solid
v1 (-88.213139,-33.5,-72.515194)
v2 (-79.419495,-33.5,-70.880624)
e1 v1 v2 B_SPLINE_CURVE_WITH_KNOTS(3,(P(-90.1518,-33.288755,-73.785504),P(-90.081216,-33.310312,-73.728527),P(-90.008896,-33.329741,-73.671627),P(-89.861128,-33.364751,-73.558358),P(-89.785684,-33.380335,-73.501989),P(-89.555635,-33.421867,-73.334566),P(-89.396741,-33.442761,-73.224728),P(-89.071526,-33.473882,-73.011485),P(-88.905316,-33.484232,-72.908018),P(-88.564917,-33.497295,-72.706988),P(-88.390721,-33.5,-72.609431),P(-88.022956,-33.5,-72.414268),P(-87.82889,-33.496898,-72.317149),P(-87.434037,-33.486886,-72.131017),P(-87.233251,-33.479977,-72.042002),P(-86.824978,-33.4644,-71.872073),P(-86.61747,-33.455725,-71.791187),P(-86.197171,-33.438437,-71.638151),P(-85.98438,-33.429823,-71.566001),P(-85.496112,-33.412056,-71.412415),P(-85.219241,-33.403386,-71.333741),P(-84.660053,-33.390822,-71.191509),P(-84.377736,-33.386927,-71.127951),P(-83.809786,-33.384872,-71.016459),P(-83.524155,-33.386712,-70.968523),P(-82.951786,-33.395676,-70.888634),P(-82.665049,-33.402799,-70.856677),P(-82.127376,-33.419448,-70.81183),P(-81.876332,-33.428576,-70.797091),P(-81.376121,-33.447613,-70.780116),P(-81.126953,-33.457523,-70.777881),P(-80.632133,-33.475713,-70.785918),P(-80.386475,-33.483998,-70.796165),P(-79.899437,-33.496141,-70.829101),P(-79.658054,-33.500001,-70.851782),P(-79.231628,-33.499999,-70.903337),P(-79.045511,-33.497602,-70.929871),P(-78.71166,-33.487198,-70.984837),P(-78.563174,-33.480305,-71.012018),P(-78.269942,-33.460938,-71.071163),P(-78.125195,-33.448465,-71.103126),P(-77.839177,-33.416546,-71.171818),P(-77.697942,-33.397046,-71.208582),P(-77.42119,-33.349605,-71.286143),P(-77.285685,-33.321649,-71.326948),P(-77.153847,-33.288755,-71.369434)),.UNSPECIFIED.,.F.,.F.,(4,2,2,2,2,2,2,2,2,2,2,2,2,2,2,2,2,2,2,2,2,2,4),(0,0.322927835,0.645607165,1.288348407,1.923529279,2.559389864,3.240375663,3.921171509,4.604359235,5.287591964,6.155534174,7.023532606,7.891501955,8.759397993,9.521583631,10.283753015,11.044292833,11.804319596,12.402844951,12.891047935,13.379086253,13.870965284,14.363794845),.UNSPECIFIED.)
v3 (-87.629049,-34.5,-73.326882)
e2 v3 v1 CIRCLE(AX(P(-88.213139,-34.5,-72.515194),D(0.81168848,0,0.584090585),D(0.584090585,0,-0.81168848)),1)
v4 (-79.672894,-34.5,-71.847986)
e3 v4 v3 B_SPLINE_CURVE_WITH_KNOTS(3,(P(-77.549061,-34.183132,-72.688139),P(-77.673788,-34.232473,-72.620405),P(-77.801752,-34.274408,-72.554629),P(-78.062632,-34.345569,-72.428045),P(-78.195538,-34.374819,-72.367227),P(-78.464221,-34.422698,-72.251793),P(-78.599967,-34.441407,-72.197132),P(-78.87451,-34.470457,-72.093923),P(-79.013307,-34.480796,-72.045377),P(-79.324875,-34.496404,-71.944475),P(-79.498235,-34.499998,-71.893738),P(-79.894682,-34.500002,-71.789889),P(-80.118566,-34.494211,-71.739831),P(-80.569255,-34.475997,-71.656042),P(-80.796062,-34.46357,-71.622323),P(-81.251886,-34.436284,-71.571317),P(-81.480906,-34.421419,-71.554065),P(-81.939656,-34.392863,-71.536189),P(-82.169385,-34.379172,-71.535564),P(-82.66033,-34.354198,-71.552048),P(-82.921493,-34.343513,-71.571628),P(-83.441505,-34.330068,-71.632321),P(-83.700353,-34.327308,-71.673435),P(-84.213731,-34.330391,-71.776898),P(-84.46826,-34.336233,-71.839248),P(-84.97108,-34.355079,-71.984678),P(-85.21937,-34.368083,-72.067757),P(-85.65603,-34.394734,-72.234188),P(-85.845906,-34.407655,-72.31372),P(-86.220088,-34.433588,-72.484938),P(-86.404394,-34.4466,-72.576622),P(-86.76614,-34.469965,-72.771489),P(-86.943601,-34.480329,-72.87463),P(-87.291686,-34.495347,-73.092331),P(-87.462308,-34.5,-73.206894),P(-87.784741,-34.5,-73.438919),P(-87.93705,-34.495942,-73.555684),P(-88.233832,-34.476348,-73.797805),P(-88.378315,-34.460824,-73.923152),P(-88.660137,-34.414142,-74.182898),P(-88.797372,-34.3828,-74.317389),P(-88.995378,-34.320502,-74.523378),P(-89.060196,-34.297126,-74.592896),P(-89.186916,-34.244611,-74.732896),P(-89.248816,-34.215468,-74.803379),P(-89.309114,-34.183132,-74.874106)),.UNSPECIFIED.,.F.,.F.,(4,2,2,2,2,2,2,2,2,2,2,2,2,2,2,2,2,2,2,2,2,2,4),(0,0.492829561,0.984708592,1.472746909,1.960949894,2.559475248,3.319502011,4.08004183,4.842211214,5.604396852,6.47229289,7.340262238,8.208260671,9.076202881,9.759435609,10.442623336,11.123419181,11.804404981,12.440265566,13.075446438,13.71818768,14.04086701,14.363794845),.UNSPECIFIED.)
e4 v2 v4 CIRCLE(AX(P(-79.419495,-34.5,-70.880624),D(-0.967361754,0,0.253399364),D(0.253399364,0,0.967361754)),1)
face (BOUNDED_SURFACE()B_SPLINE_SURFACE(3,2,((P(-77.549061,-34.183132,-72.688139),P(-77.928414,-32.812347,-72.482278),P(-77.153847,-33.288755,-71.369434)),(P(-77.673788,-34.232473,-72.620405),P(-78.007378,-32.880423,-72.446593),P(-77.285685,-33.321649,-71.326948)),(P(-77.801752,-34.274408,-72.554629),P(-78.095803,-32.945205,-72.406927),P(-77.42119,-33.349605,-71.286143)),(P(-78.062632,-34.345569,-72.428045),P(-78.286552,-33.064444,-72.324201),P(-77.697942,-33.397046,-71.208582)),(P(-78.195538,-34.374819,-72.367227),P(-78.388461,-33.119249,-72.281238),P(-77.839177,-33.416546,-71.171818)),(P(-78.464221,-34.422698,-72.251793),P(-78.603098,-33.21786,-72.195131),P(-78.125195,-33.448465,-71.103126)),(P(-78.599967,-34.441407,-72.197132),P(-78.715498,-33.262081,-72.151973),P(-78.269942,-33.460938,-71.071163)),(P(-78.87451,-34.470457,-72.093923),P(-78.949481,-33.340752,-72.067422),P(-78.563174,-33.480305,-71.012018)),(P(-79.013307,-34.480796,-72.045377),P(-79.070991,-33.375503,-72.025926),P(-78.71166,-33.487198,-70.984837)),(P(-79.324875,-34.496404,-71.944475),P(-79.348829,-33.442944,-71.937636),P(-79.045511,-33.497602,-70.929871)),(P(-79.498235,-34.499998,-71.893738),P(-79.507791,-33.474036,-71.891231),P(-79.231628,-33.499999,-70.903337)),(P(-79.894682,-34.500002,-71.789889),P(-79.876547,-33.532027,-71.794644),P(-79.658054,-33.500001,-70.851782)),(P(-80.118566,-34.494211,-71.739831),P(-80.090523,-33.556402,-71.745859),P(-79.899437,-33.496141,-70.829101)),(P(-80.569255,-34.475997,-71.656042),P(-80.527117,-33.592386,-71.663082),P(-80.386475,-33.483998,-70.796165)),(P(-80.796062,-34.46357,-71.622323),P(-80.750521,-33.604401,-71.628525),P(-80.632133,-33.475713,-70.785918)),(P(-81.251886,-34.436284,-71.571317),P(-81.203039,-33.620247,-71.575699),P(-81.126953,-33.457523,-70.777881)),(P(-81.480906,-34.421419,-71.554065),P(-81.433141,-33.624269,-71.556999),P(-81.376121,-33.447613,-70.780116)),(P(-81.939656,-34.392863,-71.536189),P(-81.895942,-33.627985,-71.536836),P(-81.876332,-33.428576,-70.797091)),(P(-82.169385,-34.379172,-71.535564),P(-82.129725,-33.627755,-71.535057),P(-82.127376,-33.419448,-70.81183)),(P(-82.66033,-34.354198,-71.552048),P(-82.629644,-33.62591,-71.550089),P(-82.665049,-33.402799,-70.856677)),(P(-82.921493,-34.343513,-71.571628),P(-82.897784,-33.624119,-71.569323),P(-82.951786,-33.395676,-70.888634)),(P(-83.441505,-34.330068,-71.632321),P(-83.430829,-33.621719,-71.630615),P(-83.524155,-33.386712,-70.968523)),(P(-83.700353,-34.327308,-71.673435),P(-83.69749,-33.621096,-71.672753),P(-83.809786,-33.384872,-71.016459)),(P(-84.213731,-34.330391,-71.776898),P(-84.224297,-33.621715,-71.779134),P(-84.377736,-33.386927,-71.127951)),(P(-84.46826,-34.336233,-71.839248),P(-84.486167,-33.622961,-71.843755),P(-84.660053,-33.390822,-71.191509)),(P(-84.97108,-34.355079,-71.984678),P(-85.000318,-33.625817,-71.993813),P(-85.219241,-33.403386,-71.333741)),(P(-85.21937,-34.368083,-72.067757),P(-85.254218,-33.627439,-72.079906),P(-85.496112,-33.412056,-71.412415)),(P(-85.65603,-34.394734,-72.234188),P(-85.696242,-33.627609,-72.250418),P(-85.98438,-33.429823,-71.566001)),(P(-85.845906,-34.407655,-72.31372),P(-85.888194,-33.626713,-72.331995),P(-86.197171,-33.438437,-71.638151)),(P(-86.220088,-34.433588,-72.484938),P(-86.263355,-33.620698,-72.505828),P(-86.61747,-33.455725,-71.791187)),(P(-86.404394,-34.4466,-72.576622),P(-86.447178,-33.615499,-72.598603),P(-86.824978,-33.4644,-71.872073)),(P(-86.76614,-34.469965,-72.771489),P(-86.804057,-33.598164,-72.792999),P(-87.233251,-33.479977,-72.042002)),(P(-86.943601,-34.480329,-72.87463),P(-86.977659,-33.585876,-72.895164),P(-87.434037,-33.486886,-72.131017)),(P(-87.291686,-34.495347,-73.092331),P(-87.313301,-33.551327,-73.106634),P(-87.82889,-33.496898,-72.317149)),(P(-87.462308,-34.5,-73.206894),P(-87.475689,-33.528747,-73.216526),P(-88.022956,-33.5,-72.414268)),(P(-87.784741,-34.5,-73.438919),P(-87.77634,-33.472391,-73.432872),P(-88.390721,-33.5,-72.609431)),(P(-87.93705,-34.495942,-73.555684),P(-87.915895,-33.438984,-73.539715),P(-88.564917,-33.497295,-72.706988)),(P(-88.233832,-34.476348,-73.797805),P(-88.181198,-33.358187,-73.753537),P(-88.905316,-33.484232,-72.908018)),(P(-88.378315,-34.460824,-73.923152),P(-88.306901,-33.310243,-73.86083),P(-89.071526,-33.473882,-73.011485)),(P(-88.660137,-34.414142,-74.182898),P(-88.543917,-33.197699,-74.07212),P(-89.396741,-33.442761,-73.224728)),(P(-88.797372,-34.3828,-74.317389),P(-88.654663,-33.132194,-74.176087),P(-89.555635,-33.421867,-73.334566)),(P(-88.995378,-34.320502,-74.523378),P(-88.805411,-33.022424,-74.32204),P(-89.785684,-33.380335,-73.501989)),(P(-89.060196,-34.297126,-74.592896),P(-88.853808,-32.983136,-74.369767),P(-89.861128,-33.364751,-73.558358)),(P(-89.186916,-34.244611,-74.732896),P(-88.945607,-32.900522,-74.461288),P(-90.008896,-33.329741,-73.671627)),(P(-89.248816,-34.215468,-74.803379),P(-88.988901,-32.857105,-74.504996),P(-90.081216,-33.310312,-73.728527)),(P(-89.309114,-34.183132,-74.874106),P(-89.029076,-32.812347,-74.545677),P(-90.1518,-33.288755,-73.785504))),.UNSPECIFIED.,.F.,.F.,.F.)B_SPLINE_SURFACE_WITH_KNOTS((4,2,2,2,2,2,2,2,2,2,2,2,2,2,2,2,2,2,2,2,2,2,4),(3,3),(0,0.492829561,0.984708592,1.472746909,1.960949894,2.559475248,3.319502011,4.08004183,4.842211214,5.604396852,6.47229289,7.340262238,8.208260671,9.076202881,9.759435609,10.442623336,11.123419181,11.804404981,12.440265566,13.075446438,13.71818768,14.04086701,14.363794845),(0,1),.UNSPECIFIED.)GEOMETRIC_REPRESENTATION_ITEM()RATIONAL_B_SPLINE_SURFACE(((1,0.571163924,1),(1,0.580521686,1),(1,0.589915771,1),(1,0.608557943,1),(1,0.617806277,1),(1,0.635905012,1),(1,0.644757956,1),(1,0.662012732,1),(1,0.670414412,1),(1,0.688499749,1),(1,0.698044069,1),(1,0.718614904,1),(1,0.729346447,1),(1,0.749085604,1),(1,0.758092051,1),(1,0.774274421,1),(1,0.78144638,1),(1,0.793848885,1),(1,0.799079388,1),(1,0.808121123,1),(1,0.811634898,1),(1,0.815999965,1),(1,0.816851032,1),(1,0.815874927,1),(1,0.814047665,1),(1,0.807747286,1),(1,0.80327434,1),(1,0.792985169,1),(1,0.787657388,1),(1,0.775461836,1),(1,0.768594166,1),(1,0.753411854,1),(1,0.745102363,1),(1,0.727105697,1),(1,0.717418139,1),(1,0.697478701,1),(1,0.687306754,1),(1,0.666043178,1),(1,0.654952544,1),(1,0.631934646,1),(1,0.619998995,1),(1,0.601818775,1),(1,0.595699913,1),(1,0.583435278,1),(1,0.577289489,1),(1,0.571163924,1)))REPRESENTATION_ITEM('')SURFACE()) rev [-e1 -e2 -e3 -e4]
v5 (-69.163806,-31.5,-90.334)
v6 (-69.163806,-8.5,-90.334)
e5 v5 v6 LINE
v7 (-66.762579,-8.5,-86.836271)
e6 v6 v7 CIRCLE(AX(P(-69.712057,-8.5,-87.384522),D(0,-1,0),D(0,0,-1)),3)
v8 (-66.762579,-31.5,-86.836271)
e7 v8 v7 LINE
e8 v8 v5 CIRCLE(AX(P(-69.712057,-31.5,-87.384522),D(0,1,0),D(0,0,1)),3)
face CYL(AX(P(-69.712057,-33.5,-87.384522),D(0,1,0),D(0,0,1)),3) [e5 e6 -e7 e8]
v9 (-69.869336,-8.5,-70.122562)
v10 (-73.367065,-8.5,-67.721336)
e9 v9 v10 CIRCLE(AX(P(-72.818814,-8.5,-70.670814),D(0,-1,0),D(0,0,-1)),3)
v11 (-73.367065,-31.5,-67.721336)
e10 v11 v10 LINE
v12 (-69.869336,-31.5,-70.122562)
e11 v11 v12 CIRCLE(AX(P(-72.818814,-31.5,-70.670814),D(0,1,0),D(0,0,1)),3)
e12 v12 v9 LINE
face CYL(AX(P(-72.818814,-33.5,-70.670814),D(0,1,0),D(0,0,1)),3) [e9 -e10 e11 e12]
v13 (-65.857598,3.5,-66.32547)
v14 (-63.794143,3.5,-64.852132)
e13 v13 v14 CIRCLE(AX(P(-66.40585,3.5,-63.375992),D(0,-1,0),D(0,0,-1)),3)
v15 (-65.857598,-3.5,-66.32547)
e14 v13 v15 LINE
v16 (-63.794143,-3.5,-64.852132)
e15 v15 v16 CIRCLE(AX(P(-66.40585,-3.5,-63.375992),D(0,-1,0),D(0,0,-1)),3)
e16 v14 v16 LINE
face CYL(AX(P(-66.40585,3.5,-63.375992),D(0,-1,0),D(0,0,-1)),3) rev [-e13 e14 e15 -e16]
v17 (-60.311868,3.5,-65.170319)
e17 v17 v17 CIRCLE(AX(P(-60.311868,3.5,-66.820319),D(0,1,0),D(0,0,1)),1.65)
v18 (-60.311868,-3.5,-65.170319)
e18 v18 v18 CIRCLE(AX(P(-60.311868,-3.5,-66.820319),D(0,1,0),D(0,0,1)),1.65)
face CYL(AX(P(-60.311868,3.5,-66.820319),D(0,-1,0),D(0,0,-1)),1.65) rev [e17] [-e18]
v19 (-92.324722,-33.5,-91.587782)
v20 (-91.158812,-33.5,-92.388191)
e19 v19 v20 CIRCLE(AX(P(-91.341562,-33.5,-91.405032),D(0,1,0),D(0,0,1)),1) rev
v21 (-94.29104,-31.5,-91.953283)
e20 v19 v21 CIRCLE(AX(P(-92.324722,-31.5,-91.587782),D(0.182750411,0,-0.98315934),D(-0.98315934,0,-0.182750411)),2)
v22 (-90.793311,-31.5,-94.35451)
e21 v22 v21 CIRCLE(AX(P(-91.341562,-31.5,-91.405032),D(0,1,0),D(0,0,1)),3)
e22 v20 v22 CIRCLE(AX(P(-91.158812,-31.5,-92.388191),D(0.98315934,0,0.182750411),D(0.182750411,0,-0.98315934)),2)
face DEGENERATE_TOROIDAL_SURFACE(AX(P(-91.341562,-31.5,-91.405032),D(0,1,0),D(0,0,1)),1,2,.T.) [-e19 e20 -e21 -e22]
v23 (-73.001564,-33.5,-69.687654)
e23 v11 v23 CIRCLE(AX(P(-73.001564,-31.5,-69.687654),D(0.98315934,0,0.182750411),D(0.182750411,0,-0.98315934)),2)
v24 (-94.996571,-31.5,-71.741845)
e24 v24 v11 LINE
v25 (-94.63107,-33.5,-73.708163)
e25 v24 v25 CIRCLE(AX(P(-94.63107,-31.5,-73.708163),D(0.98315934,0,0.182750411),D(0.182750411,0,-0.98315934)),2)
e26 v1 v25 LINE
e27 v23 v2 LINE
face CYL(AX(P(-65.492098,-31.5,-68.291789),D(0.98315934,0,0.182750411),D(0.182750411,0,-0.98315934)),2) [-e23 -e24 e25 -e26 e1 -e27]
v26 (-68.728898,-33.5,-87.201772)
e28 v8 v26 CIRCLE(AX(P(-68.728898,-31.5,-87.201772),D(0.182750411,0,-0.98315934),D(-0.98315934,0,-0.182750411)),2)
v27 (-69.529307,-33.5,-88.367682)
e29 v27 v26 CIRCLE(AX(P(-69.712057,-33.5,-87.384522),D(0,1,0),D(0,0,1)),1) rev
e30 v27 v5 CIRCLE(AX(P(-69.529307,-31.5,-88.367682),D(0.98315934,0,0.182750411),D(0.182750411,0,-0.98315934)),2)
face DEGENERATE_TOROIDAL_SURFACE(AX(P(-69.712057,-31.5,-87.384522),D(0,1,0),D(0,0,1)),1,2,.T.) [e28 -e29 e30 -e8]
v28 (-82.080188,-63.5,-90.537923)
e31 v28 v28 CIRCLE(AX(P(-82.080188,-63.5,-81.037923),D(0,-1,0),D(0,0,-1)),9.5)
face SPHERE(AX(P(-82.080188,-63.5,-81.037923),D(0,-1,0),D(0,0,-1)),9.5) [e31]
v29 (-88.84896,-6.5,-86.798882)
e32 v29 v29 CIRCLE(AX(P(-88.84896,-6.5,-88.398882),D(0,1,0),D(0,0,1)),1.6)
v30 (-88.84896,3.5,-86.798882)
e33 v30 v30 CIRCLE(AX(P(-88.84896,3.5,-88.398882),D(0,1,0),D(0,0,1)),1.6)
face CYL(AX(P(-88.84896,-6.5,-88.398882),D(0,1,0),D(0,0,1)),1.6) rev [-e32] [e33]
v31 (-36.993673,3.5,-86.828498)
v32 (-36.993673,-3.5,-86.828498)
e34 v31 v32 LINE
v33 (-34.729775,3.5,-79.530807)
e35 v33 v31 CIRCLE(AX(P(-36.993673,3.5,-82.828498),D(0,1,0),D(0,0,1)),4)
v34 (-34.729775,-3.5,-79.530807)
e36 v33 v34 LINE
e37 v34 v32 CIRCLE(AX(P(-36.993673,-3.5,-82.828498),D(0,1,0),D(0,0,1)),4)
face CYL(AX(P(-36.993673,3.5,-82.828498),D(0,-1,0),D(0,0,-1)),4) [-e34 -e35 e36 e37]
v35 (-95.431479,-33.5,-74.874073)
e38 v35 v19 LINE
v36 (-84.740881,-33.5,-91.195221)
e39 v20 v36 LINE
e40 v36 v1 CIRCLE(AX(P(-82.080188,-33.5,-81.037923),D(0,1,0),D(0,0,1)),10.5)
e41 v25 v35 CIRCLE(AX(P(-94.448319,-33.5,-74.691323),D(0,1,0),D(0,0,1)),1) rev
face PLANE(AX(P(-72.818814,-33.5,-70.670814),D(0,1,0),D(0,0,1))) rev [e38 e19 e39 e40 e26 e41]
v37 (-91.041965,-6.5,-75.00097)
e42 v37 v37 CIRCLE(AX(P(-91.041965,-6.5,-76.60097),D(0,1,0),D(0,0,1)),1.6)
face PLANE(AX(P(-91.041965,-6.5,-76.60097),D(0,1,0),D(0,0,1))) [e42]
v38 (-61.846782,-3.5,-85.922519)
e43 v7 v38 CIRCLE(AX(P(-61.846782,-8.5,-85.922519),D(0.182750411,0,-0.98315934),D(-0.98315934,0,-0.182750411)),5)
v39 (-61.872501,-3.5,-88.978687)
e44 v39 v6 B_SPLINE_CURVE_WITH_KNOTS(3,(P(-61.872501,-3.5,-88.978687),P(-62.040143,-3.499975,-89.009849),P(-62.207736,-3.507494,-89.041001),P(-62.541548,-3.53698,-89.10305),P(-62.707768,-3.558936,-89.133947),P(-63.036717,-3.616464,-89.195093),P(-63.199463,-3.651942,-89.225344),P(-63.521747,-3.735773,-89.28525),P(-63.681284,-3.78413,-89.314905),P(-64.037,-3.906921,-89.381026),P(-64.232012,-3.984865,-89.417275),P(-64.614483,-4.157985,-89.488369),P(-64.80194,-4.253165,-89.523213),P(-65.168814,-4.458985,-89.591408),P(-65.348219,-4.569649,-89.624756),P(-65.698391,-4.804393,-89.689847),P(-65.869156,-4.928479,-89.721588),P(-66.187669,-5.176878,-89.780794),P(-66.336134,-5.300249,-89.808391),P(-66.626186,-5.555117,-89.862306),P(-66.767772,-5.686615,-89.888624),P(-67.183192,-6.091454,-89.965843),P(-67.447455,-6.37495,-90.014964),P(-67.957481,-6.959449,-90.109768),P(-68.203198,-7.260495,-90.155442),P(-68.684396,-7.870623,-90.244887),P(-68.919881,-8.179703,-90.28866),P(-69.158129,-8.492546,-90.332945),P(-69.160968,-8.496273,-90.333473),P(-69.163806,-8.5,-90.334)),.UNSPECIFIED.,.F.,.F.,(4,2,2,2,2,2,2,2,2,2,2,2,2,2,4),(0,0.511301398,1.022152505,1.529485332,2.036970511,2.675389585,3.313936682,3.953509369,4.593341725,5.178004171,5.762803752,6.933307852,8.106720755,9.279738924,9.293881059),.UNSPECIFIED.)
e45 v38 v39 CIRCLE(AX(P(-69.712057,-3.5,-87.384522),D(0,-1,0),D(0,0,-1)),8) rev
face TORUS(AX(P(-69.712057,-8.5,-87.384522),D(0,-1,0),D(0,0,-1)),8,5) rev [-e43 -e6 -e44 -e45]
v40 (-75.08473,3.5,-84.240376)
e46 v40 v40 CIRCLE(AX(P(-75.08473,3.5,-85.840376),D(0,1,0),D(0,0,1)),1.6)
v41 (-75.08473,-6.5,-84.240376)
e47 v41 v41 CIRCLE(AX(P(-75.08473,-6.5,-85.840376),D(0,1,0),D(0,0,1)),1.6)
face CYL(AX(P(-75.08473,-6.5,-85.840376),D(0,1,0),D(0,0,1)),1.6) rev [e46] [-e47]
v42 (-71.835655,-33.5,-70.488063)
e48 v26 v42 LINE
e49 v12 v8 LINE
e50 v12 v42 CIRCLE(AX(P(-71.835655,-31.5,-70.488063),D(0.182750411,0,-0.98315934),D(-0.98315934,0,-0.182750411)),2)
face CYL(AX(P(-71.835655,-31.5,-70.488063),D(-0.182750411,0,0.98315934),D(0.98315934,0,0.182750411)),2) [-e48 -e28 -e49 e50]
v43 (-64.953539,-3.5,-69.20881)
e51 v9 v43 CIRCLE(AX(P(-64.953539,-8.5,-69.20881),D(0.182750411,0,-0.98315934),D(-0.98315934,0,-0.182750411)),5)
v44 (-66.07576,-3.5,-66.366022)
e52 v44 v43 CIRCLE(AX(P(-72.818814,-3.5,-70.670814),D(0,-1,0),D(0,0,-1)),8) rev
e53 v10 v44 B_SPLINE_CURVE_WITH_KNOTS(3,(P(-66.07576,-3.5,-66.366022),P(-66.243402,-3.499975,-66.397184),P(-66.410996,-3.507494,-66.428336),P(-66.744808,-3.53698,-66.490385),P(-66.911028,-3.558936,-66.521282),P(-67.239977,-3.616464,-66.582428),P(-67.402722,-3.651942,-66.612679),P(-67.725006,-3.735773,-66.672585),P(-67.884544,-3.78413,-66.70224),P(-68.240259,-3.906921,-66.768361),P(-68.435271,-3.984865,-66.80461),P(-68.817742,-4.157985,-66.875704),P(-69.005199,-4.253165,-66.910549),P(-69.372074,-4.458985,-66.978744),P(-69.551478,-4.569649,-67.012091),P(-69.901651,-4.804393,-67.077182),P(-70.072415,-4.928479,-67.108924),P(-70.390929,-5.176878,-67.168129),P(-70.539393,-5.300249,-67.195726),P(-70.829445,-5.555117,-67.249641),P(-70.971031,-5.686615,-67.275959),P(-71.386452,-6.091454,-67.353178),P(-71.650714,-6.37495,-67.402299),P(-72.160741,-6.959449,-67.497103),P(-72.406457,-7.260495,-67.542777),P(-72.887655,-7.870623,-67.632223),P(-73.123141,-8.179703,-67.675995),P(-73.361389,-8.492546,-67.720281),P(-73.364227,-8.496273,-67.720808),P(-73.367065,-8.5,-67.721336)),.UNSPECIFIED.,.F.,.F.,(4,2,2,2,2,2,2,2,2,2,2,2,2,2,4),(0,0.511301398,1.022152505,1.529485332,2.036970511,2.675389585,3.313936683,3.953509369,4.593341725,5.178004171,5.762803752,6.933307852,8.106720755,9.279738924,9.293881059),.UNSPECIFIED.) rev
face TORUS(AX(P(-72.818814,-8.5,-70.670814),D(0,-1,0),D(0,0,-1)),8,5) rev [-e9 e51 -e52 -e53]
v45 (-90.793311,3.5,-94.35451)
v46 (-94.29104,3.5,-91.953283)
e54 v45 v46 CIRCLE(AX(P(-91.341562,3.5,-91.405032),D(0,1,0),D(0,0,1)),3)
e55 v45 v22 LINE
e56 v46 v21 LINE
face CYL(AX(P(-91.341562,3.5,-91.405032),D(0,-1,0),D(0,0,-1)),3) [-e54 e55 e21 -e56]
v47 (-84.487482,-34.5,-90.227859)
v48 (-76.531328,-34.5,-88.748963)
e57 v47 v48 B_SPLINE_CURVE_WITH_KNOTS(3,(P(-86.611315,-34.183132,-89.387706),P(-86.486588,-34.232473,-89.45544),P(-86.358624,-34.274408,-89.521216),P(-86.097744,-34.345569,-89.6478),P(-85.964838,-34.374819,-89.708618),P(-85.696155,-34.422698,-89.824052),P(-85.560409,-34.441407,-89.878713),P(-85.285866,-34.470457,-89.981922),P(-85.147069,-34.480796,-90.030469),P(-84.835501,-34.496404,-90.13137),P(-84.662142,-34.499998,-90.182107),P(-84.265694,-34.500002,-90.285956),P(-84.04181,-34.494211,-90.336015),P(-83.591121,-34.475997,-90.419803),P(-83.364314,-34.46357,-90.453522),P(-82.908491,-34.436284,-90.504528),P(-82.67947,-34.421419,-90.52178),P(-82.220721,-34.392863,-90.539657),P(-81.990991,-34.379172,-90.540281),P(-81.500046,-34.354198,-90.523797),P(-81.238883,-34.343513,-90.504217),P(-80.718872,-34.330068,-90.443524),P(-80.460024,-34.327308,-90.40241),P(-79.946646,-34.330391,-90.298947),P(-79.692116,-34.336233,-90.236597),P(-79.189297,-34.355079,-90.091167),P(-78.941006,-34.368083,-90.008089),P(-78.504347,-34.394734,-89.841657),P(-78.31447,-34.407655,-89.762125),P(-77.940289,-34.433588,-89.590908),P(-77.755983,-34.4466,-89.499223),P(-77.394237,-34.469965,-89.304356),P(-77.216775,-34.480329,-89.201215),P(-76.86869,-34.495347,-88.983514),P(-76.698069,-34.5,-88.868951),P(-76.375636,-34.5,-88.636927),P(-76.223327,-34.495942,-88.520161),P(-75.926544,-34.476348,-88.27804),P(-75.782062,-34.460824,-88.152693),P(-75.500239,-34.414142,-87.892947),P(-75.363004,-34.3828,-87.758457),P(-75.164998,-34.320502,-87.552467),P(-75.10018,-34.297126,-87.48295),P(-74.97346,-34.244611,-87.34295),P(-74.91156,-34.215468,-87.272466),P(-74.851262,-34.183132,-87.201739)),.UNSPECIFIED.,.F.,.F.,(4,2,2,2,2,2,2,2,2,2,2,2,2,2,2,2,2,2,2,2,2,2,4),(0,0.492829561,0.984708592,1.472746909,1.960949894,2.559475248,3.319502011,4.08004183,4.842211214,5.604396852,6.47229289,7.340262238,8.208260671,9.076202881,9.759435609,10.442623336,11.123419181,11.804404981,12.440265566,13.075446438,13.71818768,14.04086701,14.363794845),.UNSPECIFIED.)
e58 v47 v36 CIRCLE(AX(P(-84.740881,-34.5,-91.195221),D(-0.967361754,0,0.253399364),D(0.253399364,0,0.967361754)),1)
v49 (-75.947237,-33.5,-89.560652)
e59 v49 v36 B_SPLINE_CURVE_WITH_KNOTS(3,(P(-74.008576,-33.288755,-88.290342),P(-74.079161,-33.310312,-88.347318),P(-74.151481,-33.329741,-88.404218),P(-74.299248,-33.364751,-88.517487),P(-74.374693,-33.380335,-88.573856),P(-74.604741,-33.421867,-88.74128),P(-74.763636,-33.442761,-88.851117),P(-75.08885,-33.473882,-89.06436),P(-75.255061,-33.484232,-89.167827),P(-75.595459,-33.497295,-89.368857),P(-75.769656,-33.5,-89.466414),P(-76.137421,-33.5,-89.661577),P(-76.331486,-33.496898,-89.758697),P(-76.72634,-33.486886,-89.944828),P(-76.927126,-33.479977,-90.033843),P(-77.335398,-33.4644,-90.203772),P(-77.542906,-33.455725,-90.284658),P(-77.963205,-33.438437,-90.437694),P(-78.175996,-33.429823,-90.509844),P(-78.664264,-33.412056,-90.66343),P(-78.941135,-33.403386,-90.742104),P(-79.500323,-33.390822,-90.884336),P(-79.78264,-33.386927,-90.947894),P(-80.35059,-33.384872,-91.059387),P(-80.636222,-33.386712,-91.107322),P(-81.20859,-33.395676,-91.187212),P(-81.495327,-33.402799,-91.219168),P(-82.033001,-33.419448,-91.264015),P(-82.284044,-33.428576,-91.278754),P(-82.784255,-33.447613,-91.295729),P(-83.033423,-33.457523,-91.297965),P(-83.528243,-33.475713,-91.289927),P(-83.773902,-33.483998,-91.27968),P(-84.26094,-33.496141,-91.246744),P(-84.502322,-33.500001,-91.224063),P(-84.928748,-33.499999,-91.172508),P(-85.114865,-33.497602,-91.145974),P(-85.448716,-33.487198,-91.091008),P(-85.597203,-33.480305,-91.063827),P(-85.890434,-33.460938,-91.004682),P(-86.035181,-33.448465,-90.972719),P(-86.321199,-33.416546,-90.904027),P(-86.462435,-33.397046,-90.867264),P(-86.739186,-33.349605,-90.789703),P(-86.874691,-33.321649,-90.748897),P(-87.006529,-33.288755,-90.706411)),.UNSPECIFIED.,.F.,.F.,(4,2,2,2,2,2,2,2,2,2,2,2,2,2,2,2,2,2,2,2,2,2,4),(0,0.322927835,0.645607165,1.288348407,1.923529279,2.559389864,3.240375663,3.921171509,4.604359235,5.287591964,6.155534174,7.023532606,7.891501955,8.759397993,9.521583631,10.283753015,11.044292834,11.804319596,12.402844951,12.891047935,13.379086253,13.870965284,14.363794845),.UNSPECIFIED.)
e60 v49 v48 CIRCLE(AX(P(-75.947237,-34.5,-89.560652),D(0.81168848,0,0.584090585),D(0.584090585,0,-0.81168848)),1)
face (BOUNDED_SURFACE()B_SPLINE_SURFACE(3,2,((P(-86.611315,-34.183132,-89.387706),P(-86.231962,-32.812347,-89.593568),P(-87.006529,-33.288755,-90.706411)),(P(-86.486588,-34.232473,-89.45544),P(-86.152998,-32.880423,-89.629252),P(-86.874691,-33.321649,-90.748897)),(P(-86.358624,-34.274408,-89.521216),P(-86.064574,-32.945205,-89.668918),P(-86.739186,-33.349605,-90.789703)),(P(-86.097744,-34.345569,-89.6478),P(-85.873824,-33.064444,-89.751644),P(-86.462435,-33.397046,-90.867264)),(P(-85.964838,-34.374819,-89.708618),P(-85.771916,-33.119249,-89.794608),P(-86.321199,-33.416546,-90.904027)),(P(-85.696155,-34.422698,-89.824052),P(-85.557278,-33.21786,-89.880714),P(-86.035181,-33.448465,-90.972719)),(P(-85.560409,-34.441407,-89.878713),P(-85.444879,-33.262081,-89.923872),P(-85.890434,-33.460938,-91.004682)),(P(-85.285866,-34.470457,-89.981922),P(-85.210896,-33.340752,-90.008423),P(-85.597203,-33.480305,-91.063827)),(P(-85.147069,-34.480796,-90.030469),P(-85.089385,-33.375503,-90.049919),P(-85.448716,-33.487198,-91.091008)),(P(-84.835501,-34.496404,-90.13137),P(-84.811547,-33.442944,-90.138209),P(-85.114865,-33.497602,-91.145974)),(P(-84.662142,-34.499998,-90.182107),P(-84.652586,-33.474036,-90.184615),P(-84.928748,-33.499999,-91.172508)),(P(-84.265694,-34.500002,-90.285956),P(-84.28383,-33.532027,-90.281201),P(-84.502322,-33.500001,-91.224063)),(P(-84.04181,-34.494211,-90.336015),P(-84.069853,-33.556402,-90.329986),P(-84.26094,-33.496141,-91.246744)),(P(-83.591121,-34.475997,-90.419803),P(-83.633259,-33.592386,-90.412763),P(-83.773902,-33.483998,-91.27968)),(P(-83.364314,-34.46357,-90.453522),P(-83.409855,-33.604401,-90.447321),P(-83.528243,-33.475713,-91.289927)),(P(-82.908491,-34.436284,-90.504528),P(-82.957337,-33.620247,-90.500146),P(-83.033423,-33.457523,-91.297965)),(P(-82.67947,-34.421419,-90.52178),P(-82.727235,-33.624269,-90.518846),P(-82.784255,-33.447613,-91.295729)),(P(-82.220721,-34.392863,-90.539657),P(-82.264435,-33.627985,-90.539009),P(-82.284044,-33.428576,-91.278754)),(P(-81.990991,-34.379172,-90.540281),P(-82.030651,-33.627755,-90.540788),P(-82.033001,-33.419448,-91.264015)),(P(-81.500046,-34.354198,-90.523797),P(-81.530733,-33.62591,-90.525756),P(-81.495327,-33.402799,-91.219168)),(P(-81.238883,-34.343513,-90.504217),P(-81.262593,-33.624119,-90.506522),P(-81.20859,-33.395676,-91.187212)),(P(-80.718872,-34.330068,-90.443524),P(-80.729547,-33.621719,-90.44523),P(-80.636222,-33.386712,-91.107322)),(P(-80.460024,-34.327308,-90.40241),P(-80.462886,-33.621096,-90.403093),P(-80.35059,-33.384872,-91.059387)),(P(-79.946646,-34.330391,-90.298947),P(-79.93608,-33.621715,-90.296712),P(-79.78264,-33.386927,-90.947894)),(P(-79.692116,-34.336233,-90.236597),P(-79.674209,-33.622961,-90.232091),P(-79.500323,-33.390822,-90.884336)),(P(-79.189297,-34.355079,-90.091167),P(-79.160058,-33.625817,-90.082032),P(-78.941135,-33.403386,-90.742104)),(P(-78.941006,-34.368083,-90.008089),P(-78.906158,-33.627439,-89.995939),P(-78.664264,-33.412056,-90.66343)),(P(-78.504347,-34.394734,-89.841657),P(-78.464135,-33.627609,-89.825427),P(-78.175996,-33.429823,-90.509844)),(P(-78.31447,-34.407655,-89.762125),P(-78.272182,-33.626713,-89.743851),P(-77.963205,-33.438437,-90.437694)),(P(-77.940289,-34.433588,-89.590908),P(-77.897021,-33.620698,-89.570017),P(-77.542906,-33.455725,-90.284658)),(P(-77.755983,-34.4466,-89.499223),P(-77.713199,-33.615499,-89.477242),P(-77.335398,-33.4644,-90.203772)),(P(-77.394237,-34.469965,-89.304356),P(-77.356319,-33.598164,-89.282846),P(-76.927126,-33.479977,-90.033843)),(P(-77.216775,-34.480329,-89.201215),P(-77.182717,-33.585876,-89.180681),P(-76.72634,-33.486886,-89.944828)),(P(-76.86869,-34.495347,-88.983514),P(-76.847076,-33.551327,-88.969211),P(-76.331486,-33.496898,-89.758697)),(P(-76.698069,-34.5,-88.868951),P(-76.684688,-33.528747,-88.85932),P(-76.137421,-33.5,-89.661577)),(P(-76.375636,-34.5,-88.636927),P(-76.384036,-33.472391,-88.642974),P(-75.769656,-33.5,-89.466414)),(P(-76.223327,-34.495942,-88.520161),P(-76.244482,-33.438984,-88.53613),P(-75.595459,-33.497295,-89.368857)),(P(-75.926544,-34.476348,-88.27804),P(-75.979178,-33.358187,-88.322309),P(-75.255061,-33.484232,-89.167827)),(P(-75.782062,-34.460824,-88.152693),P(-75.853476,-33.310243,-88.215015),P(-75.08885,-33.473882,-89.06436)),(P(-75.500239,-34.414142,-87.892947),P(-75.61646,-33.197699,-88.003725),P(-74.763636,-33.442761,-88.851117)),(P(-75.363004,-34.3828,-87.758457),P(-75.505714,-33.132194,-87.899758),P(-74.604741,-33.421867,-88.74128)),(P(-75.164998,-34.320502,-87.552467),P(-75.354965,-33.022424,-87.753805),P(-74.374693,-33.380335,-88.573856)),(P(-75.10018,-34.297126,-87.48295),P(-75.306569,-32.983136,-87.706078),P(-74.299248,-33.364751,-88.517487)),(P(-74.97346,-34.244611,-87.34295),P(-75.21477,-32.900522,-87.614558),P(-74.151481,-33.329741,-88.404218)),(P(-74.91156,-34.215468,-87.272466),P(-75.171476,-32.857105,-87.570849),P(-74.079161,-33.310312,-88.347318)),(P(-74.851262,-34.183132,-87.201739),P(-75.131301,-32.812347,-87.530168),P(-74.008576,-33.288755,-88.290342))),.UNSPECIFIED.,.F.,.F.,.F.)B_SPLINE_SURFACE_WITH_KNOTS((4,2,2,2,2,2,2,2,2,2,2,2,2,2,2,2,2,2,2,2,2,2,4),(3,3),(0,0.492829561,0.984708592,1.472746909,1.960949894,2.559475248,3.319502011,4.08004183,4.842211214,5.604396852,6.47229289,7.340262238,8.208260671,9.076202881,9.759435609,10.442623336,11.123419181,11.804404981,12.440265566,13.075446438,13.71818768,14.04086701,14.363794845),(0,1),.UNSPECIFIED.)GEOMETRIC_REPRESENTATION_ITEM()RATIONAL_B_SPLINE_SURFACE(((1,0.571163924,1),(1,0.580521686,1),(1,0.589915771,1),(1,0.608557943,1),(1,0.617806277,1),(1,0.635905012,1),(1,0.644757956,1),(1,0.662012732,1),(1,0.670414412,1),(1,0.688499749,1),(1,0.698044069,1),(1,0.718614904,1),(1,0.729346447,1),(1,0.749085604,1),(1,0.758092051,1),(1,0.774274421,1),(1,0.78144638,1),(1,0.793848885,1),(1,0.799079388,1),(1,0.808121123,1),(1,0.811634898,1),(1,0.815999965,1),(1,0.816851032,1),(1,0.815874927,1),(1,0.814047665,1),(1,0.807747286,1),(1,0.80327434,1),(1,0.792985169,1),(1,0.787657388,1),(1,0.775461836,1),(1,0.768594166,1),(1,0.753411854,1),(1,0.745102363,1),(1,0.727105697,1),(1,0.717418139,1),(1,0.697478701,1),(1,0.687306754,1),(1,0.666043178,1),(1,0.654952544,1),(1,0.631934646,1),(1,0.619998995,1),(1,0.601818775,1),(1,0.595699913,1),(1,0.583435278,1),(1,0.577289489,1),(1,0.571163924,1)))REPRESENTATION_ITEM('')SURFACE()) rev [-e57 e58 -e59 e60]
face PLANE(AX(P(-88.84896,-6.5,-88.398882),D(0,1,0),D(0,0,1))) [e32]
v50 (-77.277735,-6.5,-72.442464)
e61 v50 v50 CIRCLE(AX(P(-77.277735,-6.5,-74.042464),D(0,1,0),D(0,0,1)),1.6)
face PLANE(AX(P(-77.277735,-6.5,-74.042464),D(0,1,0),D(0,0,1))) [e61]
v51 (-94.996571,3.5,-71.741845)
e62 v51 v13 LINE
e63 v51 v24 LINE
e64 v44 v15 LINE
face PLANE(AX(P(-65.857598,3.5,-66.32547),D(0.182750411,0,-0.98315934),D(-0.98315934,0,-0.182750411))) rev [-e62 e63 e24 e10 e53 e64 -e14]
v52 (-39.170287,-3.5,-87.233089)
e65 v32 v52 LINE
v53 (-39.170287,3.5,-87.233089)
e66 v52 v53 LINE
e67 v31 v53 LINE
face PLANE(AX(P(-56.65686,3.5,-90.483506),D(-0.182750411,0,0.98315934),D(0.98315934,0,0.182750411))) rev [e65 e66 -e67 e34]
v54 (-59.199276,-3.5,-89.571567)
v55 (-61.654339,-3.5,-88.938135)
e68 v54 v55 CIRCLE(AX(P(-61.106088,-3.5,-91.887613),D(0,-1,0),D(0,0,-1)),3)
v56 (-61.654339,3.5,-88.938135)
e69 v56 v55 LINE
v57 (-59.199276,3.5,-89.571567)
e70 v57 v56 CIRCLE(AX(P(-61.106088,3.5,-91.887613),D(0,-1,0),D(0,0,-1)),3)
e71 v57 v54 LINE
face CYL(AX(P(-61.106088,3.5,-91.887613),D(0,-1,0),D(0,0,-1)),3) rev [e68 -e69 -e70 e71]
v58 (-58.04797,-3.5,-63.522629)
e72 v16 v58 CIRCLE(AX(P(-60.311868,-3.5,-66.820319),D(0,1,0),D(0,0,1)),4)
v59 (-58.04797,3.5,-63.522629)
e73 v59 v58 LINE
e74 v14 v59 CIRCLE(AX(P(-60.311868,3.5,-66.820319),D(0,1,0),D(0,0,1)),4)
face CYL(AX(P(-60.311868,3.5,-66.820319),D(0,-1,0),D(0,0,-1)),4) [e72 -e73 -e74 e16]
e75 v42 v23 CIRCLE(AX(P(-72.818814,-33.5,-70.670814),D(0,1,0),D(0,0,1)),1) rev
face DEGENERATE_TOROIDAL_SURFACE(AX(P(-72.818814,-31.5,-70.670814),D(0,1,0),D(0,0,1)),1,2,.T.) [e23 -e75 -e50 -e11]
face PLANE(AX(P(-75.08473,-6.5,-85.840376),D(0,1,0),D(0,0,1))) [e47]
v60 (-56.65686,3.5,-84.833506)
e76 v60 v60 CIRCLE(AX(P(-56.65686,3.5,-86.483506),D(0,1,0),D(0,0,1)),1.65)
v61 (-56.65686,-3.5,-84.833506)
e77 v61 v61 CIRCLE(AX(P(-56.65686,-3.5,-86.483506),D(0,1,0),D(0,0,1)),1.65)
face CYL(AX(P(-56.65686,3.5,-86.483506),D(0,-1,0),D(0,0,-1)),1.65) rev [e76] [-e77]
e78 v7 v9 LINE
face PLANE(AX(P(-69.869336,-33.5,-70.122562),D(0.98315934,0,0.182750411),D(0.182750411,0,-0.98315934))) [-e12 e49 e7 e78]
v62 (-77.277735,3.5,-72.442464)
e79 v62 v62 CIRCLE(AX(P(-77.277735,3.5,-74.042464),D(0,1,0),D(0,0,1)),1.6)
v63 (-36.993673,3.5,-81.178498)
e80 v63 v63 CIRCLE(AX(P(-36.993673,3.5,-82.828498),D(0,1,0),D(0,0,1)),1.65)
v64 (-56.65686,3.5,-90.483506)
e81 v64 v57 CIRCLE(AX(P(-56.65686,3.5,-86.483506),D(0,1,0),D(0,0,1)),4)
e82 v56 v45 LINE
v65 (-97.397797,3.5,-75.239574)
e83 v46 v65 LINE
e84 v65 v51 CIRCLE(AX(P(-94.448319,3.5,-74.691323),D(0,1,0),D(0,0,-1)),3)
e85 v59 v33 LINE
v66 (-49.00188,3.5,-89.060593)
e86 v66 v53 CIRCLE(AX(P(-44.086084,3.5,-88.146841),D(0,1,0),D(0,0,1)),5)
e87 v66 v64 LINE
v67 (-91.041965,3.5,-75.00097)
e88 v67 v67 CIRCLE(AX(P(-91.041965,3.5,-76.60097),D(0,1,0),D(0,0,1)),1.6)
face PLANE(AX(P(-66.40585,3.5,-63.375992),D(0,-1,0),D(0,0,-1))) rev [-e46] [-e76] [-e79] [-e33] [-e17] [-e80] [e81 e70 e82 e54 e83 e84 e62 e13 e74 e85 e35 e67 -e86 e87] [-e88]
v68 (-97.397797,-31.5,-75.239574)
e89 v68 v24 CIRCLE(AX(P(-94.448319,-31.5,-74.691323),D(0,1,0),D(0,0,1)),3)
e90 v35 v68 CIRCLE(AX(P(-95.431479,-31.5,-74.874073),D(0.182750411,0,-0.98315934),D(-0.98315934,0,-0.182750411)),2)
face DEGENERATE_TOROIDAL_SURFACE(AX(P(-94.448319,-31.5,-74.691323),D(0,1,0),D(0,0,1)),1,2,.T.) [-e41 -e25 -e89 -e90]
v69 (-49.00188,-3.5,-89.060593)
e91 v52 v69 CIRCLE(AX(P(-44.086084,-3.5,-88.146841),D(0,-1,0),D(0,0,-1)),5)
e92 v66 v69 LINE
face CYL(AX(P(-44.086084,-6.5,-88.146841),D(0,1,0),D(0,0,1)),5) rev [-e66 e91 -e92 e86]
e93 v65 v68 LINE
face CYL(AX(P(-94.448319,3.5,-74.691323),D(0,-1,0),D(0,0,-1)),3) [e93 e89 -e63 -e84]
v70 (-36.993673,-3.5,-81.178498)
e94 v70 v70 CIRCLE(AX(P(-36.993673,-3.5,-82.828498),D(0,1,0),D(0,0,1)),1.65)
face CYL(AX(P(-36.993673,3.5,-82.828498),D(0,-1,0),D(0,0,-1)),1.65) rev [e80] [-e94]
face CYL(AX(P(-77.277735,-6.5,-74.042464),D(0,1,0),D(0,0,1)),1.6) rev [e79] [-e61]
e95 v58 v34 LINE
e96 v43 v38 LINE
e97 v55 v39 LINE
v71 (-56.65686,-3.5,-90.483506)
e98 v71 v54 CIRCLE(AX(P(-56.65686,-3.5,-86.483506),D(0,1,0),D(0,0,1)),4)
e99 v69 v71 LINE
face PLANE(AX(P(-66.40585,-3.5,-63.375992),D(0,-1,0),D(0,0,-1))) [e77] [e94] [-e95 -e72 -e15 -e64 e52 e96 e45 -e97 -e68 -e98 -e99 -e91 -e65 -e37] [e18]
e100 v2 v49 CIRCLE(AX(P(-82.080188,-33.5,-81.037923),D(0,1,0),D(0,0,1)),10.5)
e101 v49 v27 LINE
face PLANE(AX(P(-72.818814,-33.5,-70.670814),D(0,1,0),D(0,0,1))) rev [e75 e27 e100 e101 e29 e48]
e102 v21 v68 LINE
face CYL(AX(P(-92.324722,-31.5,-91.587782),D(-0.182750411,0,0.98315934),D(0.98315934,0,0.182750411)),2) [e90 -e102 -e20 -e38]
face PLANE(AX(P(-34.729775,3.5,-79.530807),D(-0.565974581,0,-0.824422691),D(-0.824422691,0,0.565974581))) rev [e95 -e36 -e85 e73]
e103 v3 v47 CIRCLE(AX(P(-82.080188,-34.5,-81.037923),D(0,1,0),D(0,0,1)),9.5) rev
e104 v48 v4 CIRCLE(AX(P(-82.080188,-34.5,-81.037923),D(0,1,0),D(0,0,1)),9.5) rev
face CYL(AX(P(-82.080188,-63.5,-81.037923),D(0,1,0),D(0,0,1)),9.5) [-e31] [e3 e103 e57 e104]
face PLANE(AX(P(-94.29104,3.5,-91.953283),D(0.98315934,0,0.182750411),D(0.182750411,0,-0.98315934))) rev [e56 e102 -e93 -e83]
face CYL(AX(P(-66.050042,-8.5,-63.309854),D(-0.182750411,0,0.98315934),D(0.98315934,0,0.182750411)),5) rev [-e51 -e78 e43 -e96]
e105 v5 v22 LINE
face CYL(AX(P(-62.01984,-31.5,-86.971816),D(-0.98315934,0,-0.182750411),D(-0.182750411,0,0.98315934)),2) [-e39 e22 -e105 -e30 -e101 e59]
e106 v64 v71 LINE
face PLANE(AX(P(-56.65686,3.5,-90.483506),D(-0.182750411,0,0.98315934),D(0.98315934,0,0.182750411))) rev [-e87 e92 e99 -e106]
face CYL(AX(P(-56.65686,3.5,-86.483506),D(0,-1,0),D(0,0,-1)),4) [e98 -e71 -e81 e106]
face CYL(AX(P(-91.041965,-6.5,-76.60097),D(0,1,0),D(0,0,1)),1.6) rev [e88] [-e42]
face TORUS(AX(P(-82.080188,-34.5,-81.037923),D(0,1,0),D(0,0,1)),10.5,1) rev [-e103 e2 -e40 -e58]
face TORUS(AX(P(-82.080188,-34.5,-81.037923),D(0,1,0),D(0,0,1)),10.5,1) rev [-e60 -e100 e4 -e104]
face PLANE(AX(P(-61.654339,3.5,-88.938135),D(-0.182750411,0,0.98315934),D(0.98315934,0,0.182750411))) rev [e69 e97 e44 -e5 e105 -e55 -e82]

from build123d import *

# Parameters (mm, degrees)
SKETCH1_R           = 1.650000007
BOSS_EXTRUDE1_DEPTH = 3.5
BOSS_EXTRUDE3_DEPTH = 30
FILLET1_R           = 5
FILLET2_R           = 2
SKETCH4_R           = 9.5
BOSS_EXTRUDE4_DEPTH = 30
FILLET3_R           = 1
REVOLVE1_ANGLE      = 180
SKETCH6_R           = 5
CUT_EXTRUDE1_DEPTH  = 10
SKETCH7_R           = 1.6
CUT_EXTRUDE2_DEPTH  = 10


with BuildPart() as part:
    # Sketch1 → Boss-Extrude1 (new, symmetric)
    with BuildSketch(Plane(origin=(0, 0, 0), x_dir=(1, 0, 0), z_dir=(0, 1, 0))):
        with BuildLine():
            Line((-56.656859897, 90.483506167), (-36.993673105, 86.828497938))
            ThreePointArc((-36.993673105, 86.828497938), (-33.173282872, 84.013663947), (-34.729774781, 79.530807173))
            Line((-34.729774781, 79.530807173), (-58.047969803, 63.522628609))
            ThreePointArc((-58.047969803, 63.522628609), (-61.213536363, 62.923269927), (-63.79414326, 64.852132418))
            ThreePointArc((-63.79414326, 64.852132418), (-64.662572796, 65.817505246), (-65.857598376, 66.32547022))
            Line((-65.857598376, 66.32547022), (-94.996570641, 71.741844715))
            ThreePointArc((-94.996570641, 71.741844715), (-96.92158748, 72.993398991), (-97.397797425, 75.239573968))
            Line((-97.397797425, 75.239573968), (-94.29104043, 91.953282742))
            ThreePointArc((-94.29104043, 91.953282742), (-93.039486154, 93.878299581), (-90.793311177, 94.354509526))
            Line((-90.793311177, 94.354509526), (-61.654338999, 88.938135048))
            ThreePointArc((-61.654338999, 88.938135048), (-60.356600681, 88.982743171), (-59.199275822, 89.571567253))
            ThreePointArc((-59.199275822, 89.571567253), (-58.007370108, 90.248625312), (-56.656859897, 90.483506167))
        make_face()
        with Locations(Location((-56.656859897, 86.483506167, 0), (0, 0, 270))):
            Circle(SKETCH1_R, mode=Mode.SUBTRACT)
        with Locations(Location((-36.993673105, 82.828497938, 0), (0, 0, 270))):
            Circle(SKETCH1_R, mode=Mode.SUBTRACT)
        with Locations(Location((-60.311868127, 66.820319374, 0), (0, 0, 270))):
            Circle(SKETCH1_R, mode=Mode.SUBTRACT)
    extrude(amount=BOSS_EXTRUDE1_DEPTH, both=True)

    # Sketch3 → Boss-Extrude3 (add)
    with BuildSketch(Plane(origin=(0, -3.5, 0), x_dir=(1, 0, 0), z_dir=(0, 1, 0))):
        with BuildLine():
            Line((-69.163805705, 90.334000474), (-90.793311177, 94.354509526))
            ThreePointArc((-90.793311177, 94.354509526), (-93.039486154, 93.878299581), (-94.29104043, 91.953282742))
            Line((-94.29104043, 91.953282742), (-97.397797425, 75.239573968))
            ThreePointArc((-97.397797425, 75.239573968), (-96.92158748, 72.993398991), (-94.996570641, 71.741844715))
            Line((-94.996570641, 71.741844715), (-73.367065169, 67.721335662))
            ThreePointArc((-73.367065169, 67.721335662), (-71.120890192, 68.197545608), (-69.869335915, 70.122562447))
            Line((-69.869335915, 70.122562447), (-66.762578921, 86.836271221))
            ThreePointArc((-66.762578921, 86.836271221), (-67.238788866, 89.082446198), (-69.163805705, 90.334000474))
        make_face()
    extrude(amount=-BOSS_EXTRUDE3_DEPTH)

    # Fillet1
    # the kernel refuses this fillet: 5 mm, written as the material it adds along each edge
    with BuildSketch(Plane(origin=(-72.818813934, -3.5, -70.670813681), x_dir=(0.9358033400655833, 0, -0.35252249392357676), z_dir=(0.35252249392357676, 0, 0.9358033400655833))) as fillet1_piece_1_section:
        with BuildLine():
            CenterArc((3 + FILLET1_R, -FILLET1_R), FILLET1_R, 90, 90)
            Line((3 + FILLET1_R, 0), (3, 0))
            Line((3, 0), (3, -FILLET1_R))
        make_face()
    fillet1_piece_1 = revolve(axis=Axis((-72.818813934, -3.5, -70.670813681), (0, 1, 0)), revolution_arc=328.828315396, mode=Mode.PRIVATE)
    fillet1_piece_1 = split(fillet1_piece_1, bisect_by=Plane(origin=(-73.367065169, -3.5, -67.721335662), z_dir=(0.18275041146570634, 0, -0.9831593396337722)), keep=Keep.TOP, mode=Mode.PRIVATE)
    add(fillet1_piece_1)
    with BuildSketch(Plane(origin=(-69.869335915, -3.5, -70.122562447), x_dir=(0, -1, 0), z_dir=(0.18275041146570747, 0, -0.9831593396337721))) as fillet1_piece_2:
        with BuildLine():
            CenterArc((FILLET1_R, -FILLET1_R), FILLET1_R, 90, 90)
            Line((0, -FILLET1_R), (0, 0))
            Line((0, 0), (FILLET1_R, 0))
        make_face()
    extrude(amount=17)
    with BuildSketch(Plane(origin=(-69.712056939, -3.5, -87.384522455), x_dir=(0.9831593396337688, 0, 0.18275041146572465), z_dir=(-0.18275041146572465, 0, 0.9831593396337688))) as fillet1_piece_3_section:
        with BuildLine():
            CenterArc((3 + FILLET1_R, -FILLET1_R), FILLET1_R, 90, 90)
            Line((3 + FILLET1_R, 0), (3, 0))
            Line((3, 0), (3, -FILLET1_R))
        make_face()
    fillet1_piece_3 = revolve(axis=Axis((-69.712056939, -3.5, -87.384522455), (0, 1, 0)), revolution_arc=328.828315396, mode=Mode.PRIVATE)
    fillet1_piece_3 = split(fillet1_piece_3, bisect_by=Plane(origin=(-69.163805705, -3.5, -90.334000474), z_dir=(-0.1827504114659838, 0, 0.9831593396337207)), keep=Keep.TOP, mode=Mode.PRIVATE)
    add(fillet1_piece_3)

    # Fillet2
    fillet2_edges = [part.edges().sort_by_distance(p)[0] for p in [
        (-71.120890192, -33.5, -68.197545608),
        (-84.181817905, -33.5, -69.731590188),
        (-96.92158748, -33.5, -72.993398991),
        (-95.844418928, -33.5, -83.596428355),
        (-93.039486154, -33.5, -93.878299581),
        (-79.978558441, -33.5, -92.344255),
        (-67.238788866, -33.5, -89.082446198),
        (-68.315957418, -33.5, -78.479416834),
    ]]
    fillet(fillet2_edges, radius=FILLET2_R)

    # Sketch4 → Boss-Extrude4 (add)
    with BuildSketch(Plane(origin=(0, -33.5, 0), x_dir=(-1, 0, 0), z_dir=(0, -1, 0))):
        with Locations(Location((82.080188173, 81.037922594, 0), (0, 0, 280.530004657))):
            Circle(SKETCH4_R)
    extrude(amount=BOSS_EXTRUDE4_DEPTH)

    # Fillet3
    fillet3_edges = [part.edges().sort_by_distance(p)[0] for p in [
        (-72.740174433, -33.5, -79.301793759),
        (-91.420201913, -33.5, -82.77405143),
    ]]
    fillet(fillet3_edges, radius=FILLET3_R)

    # Sketch5 → Revolve1 (revolve)
    with BuildSketch(Plane(origin=(0, -63.5, 0), x_dir=(-1, 0, 0), z_dir=(0, -1, 0))):
        with BuildLine():
            Line((82.080188173, 90.537922594), (82.080188173, 71.537922594))
            ThreePointArc((82.080188173, 71.537922594), (91.580188173, 81.037922594), (82.080188173, 90.537922594))
        make_face()
    revolve(axis=Axis((-82.080188173, -63.5, -90.537922594), (0, 0, 1)), revolution_arc=REVOLVE1_ANGLE)

    # Sketch6 → Cut-Extrude1 (cut)
    with BuildSketch(Plane(origin=(0, 3.5, 0), x_dir=(1, 0, 0), z_dir=(0, 1, 0))):
        with Locations((-44.086083588, 88.146840634)):
            Circle(SKETCH6_R)
    extrude(amount=-CUT_EXTRUDE1_DEPTH, mode=Mode.SUBTRACT)

    # Sketch7 → Cut-Extrude2 (cut)
    with BuildSketch(Plane(origin=(0, 3.5, 0), x_dir=(1, 0, 0), z_dir=(0, 1, 0))):
        with Locations(Location((-88.848960421, 88.398881924, 0), (0, 0, 270))):
            Circle(SKETCH7_R)
        with Locations(Location((-91.041965359, 76.600969848, 0), (0, 0, 270))):
            Circle(SKETCH7_R)
        with Locations(Location((-75.084729666, 85.840376163, 0), (0, 0, 270))):
            Circle(SKETCH7_R)
        with Locations(Location((-77.277734604, 74.042464088, 0), (0, 0, 270))):
            Circle(SKETCH7_R)
    extrude(amount=-CUT_EXTRUDE2_DEPTH, mode=Mode.SUBTRACT)


solid = part.part
